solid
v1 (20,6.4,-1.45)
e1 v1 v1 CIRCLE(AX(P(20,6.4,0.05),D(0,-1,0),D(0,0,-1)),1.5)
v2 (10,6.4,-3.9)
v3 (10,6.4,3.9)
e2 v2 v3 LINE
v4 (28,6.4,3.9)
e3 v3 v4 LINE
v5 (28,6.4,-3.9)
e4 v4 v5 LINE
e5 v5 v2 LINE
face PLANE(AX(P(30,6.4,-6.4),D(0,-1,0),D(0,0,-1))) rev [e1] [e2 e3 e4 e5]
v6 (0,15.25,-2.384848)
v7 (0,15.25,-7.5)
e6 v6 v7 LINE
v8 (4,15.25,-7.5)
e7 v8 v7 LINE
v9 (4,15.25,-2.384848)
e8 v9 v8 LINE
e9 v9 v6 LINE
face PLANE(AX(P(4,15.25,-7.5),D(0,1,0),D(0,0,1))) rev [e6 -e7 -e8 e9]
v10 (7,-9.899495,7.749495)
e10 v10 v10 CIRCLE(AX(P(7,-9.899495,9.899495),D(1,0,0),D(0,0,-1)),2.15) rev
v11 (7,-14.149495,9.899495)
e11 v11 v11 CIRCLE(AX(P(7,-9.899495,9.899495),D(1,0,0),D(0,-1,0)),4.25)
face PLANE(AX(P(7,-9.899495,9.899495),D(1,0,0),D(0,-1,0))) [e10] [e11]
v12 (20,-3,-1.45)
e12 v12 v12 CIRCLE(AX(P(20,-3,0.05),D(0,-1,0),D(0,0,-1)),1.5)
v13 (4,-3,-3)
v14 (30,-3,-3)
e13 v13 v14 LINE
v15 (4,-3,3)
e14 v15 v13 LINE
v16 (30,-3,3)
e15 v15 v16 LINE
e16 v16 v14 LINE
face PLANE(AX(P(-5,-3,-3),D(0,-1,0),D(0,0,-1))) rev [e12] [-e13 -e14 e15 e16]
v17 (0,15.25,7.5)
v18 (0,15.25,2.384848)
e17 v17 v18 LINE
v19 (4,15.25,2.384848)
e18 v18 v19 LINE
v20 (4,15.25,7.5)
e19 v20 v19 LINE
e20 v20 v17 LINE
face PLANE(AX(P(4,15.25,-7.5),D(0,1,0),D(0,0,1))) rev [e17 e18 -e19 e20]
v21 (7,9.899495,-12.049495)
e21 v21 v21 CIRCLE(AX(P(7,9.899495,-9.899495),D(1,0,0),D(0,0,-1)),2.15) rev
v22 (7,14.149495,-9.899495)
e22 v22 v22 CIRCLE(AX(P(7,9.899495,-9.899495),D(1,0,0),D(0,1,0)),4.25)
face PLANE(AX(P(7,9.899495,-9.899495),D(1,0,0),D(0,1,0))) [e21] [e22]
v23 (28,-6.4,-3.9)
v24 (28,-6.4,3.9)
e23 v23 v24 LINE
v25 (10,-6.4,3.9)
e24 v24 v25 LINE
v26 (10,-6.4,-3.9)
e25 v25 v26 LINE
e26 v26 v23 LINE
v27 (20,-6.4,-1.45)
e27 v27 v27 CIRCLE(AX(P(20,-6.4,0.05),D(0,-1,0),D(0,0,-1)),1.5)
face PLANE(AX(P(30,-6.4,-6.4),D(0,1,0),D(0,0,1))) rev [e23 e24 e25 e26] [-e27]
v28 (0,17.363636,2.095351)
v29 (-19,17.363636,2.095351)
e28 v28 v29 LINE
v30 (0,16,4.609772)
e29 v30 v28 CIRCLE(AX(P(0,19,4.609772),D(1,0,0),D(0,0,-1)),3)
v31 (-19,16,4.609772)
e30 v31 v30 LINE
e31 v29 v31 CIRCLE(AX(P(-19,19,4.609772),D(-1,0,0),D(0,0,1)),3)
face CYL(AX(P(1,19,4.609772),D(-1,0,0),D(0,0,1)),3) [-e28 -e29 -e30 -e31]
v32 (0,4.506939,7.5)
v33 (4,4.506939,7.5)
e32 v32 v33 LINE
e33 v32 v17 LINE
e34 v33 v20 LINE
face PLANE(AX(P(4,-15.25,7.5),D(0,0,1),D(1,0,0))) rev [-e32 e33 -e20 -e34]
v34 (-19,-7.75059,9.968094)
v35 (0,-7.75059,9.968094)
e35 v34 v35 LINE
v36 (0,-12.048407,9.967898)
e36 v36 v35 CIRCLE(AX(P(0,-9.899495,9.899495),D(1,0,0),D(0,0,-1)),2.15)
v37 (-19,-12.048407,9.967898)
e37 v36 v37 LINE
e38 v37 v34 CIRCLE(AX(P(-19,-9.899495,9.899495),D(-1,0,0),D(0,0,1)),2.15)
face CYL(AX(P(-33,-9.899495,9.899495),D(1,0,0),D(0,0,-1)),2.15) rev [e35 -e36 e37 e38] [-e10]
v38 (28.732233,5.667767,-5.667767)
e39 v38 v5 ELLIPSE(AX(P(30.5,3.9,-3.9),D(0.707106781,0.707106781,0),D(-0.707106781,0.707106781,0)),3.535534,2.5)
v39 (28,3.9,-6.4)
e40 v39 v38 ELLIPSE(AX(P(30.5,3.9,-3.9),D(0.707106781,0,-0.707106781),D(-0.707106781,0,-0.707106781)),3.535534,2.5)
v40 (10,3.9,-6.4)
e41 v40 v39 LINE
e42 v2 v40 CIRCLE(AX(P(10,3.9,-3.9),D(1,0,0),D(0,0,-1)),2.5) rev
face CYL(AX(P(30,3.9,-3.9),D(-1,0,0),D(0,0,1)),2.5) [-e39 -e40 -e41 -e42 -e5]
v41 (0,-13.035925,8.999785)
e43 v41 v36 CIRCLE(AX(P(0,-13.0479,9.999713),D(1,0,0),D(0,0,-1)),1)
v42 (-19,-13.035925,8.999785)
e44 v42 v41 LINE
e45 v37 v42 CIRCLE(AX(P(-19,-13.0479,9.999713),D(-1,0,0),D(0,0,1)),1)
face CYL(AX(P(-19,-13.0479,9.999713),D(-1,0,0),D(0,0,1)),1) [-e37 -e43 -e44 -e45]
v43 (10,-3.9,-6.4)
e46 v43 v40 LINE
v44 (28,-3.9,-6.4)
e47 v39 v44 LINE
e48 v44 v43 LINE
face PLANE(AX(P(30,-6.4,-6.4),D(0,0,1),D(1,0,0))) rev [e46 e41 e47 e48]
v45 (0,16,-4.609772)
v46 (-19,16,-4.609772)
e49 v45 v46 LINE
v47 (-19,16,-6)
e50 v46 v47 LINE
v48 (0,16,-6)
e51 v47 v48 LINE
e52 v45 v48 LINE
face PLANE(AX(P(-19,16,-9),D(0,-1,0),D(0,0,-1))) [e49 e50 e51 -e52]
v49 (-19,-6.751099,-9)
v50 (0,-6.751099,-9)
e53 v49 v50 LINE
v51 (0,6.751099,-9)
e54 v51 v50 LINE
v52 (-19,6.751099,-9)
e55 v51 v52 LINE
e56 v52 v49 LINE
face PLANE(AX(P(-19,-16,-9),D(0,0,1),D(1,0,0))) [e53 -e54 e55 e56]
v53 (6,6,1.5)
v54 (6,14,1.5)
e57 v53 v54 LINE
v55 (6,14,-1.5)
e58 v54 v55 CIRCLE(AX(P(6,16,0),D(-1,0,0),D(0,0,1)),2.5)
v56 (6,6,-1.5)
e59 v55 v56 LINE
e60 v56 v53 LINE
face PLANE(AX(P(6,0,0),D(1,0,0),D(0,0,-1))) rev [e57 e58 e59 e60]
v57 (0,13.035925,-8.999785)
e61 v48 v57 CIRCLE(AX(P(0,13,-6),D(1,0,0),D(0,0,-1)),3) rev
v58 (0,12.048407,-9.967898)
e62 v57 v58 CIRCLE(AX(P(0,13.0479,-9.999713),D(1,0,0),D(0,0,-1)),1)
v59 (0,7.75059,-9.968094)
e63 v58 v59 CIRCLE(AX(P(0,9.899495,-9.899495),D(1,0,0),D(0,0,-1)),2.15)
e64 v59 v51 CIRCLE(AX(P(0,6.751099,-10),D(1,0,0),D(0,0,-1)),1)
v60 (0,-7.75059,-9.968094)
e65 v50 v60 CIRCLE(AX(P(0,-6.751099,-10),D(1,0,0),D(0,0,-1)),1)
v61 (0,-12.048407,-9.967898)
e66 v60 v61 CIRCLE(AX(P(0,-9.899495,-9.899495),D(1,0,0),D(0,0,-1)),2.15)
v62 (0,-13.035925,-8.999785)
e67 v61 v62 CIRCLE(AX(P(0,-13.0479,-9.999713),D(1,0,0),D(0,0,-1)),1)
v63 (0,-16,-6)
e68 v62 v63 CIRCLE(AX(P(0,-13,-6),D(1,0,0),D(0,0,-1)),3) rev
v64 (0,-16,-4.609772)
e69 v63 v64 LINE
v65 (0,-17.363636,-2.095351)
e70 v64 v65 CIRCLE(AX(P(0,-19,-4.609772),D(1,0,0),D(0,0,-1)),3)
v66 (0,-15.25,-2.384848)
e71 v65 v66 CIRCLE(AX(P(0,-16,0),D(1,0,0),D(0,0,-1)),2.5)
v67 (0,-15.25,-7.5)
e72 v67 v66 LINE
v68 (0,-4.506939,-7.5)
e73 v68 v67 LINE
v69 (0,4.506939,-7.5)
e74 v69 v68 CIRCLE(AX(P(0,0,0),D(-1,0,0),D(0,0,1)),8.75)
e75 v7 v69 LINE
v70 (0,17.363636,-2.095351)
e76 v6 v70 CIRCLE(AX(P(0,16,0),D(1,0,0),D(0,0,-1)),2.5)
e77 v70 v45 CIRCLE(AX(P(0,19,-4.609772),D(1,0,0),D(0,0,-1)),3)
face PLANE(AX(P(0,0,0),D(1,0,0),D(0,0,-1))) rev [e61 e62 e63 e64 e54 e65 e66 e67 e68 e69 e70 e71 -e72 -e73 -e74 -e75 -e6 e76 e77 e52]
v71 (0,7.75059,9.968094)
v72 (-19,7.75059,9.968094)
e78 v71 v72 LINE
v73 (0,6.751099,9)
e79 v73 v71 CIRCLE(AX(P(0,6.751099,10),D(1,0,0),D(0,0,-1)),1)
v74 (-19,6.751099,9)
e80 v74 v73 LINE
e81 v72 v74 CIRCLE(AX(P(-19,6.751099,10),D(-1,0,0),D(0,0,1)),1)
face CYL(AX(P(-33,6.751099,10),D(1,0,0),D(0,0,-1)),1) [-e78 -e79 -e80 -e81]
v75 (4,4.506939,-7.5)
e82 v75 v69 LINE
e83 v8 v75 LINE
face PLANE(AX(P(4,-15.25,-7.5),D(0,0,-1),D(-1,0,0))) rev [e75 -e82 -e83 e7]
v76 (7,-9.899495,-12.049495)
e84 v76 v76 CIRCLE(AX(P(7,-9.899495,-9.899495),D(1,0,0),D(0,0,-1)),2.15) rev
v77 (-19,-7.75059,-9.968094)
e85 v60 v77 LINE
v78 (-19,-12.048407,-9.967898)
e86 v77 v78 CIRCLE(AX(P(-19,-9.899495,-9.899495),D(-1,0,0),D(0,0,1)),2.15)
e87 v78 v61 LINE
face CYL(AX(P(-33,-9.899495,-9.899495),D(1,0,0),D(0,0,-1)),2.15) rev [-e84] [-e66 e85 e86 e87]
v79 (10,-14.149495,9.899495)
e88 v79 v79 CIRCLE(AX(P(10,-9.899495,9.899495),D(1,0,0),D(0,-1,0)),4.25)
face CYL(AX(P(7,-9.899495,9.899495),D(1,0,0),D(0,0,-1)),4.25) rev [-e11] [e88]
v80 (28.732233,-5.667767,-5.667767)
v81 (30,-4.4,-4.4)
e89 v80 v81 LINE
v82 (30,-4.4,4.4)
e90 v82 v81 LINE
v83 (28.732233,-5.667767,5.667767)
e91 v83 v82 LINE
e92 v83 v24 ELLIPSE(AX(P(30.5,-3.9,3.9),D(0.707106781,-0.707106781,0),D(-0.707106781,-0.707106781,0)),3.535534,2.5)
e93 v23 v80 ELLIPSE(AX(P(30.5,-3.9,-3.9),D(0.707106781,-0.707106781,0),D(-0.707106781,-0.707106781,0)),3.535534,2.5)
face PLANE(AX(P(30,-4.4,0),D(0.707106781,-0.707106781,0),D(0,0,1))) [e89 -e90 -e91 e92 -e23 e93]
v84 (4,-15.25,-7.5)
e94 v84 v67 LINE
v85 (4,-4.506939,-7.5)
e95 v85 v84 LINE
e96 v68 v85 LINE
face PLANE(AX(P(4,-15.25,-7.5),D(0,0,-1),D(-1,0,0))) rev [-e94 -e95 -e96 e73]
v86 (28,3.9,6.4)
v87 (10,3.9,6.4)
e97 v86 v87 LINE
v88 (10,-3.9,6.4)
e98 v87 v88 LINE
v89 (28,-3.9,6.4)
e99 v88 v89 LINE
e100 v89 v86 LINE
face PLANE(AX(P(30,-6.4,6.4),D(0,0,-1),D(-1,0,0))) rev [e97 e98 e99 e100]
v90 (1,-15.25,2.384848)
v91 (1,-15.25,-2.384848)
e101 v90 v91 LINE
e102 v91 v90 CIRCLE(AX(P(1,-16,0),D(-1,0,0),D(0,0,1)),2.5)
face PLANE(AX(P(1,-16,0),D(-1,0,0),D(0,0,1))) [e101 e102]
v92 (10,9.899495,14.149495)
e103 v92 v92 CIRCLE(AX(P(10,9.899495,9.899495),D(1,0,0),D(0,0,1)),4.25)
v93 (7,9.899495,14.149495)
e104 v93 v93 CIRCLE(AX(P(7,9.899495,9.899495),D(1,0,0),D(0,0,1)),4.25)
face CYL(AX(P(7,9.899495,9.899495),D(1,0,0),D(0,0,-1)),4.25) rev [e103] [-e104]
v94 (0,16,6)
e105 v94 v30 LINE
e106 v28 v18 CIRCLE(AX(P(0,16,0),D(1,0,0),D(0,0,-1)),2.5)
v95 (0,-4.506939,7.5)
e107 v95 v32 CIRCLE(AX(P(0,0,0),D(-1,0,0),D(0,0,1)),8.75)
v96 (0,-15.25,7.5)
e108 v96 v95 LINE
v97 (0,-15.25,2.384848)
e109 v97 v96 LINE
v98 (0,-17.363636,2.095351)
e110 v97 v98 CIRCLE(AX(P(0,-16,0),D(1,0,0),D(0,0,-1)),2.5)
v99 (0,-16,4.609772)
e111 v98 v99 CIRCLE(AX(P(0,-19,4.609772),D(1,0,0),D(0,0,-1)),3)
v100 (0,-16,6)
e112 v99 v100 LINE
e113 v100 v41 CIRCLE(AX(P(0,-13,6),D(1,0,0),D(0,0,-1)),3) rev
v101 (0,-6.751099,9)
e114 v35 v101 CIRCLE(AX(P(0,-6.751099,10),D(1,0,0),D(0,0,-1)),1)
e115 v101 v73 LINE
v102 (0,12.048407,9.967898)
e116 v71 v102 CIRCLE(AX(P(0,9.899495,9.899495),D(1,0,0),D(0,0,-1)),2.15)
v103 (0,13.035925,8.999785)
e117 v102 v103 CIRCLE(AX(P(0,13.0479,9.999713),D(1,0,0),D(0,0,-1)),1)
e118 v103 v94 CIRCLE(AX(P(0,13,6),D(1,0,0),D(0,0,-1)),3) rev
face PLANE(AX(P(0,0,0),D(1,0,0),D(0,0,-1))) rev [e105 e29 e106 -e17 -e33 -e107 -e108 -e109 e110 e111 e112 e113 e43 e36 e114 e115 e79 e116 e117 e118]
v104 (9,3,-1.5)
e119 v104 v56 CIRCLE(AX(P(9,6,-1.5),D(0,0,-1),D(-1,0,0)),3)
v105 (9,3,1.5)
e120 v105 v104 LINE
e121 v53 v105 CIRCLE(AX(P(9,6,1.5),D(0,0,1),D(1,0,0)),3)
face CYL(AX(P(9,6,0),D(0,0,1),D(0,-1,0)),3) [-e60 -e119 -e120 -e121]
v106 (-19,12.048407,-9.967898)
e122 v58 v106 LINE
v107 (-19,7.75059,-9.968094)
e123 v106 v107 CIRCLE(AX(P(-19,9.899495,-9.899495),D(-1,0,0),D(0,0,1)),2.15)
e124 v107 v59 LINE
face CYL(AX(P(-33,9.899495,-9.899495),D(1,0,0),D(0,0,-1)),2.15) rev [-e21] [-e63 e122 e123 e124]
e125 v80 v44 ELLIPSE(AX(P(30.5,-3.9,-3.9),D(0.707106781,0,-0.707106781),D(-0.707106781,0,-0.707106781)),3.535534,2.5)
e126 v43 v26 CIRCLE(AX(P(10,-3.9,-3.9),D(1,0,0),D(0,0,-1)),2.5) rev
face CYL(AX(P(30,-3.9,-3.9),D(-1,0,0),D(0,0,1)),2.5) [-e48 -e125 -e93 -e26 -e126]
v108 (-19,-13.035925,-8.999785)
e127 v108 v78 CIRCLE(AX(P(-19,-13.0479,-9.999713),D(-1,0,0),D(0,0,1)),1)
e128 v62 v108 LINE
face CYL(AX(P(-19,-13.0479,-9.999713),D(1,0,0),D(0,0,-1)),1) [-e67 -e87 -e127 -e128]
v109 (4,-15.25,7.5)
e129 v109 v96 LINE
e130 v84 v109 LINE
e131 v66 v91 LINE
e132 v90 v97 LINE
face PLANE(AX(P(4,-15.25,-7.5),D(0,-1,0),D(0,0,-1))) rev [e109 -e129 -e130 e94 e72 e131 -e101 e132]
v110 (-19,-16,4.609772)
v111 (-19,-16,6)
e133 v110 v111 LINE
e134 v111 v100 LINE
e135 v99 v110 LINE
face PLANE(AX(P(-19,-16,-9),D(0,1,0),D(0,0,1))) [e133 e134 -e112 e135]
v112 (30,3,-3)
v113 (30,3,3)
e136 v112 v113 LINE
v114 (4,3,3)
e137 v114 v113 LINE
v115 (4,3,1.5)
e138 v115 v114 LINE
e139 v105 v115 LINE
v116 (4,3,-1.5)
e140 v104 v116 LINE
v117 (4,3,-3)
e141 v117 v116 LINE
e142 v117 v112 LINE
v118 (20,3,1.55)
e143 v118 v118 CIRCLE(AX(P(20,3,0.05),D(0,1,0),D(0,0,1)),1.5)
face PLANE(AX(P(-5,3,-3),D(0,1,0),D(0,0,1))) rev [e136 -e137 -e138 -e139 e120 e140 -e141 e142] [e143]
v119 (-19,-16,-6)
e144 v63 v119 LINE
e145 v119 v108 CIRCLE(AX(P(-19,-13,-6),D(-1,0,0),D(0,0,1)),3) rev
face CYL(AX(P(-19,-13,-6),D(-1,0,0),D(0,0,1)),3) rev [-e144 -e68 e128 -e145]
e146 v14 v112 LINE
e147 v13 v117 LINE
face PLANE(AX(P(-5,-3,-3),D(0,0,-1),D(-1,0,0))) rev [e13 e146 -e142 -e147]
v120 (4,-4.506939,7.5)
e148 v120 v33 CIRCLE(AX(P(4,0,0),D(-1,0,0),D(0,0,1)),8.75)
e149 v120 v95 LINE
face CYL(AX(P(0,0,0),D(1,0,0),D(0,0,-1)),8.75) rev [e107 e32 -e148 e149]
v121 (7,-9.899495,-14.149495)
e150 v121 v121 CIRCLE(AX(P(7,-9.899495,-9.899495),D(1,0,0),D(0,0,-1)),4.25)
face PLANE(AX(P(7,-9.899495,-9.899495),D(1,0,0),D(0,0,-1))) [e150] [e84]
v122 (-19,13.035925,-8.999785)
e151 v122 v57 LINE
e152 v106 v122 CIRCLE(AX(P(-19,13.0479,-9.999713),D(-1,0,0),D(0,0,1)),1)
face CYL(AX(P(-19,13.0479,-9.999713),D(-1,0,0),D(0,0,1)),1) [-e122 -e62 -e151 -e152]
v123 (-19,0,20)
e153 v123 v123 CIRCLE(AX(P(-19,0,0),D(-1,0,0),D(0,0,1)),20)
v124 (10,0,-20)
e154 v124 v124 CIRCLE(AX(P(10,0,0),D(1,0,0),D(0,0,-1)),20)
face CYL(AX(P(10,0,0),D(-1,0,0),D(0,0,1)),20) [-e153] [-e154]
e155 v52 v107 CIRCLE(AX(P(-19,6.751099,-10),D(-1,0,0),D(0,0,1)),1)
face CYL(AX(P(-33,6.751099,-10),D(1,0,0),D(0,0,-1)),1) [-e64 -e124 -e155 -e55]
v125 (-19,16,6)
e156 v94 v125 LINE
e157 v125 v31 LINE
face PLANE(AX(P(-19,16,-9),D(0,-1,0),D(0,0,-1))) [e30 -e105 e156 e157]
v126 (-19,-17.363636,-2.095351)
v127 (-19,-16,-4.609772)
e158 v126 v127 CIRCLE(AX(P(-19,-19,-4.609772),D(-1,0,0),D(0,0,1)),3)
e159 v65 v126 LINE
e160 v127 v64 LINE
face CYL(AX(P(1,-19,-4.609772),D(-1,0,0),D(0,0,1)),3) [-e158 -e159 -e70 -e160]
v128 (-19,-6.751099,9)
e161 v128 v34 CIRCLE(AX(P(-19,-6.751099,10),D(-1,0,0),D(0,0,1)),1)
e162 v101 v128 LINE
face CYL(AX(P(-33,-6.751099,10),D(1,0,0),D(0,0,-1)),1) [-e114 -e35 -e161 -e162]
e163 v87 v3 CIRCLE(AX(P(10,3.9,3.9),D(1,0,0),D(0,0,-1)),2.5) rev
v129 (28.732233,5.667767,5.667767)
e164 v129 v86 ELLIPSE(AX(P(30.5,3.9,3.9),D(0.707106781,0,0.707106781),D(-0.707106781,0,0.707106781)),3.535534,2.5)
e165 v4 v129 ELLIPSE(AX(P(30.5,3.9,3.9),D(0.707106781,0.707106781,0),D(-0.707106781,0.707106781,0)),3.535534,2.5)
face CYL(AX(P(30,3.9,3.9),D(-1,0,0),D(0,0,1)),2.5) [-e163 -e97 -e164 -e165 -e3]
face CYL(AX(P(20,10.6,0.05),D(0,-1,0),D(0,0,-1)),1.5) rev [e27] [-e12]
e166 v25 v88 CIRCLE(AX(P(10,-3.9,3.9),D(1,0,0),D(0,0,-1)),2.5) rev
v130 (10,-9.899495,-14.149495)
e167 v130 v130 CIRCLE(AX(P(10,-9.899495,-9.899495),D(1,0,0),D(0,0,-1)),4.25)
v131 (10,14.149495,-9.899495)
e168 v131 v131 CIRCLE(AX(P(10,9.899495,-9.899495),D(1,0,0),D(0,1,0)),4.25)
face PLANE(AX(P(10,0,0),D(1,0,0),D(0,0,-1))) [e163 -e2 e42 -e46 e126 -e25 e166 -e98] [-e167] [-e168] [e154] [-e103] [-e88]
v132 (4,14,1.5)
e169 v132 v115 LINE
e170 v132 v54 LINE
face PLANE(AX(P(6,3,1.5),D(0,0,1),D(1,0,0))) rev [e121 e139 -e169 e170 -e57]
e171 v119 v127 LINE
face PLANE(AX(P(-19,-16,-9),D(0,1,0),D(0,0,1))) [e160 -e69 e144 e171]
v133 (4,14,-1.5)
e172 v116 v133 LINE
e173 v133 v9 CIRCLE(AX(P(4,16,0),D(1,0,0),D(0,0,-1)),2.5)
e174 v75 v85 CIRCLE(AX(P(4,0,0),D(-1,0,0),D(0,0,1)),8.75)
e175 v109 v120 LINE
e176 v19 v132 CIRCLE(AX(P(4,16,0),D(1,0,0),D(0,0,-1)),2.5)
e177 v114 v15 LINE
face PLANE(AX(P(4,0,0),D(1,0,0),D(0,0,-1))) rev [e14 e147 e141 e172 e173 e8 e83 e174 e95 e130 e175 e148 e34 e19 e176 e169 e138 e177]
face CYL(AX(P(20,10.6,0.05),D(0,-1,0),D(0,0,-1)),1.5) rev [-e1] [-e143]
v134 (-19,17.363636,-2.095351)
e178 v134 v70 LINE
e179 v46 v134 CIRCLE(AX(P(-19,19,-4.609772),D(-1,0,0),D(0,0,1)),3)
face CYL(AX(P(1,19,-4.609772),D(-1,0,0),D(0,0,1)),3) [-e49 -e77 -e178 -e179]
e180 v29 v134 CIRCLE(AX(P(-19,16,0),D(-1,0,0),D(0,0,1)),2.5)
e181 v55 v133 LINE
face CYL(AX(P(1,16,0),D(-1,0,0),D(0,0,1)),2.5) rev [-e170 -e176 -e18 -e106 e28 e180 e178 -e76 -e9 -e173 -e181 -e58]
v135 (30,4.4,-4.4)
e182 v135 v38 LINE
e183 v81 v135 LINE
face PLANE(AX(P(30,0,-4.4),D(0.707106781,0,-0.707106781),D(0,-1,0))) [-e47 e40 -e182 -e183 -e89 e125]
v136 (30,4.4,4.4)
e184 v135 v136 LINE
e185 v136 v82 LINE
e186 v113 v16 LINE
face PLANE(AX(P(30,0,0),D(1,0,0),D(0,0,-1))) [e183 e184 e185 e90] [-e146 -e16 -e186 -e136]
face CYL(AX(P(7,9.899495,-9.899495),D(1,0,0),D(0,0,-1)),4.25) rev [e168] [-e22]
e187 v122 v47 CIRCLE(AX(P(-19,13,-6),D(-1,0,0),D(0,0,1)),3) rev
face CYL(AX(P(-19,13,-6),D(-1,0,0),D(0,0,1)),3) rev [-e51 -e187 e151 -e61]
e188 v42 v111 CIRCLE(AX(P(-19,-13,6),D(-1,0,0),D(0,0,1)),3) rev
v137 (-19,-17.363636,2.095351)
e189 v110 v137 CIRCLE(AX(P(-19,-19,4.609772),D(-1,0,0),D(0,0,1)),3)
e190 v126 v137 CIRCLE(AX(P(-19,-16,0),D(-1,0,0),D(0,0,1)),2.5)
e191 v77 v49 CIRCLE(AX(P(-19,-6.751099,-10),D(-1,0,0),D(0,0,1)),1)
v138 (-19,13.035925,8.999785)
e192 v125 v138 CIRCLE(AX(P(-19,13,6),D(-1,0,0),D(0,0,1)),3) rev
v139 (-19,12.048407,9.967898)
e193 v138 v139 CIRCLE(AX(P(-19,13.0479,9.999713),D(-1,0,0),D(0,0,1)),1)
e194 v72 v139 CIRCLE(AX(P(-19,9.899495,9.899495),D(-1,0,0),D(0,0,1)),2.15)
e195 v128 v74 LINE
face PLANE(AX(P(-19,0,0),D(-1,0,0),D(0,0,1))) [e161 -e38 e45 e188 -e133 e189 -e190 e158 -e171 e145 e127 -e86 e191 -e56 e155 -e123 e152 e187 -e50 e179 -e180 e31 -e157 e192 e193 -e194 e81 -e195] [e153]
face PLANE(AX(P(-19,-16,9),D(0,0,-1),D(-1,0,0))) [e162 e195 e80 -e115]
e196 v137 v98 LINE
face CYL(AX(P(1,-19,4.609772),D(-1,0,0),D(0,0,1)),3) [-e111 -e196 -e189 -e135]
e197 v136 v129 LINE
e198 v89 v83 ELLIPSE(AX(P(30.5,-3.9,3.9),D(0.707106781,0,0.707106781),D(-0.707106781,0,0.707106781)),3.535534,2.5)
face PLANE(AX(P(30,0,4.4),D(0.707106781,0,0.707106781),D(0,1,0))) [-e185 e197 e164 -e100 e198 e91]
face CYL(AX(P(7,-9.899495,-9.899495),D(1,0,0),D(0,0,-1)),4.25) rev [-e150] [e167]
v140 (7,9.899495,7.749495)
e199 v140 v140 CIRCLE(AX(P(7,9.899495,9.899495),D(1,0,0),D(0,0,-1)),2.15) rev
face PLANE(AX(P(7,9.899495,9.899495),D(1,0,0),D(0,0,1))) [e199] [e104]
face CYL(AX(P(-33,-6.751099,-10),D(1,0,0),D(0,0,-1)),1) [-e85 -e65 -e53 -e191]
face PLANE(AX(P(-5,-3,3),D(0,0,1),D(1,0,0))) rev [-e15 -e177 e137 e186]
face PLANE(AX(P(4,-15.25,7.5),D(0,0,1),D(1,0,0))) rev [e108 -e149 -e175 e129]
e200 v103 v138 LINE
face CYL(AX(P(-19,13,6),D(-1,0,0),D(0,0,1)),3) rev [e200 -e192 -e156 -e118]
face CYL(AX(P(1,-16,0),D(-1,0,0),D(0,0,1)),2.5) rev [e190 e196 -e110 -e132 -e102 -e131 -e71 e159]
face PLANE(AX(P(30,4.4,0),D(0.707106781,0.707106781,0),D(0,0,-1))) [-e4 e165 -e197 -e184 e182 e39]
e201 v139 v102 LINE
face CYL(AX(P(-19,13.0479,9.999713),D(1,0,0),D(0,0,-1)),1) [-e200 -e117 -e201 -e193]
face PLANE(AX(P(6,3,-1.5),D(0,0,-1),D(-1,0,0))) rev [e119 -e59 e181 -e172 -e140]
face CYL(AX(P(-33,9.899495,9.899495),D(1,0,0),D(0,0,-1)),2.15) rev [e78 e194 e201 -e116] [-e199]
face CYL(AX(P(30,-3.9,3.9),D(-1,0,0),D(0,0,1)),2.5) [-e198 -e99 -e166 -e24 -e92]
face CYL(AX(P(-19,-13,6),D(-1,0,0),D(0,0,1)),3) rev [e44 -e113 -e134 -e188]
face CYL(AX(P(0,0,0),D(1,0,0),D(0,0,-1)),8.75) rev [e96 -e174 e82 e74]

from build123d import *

# Parameters (mm, degrees)
SKETCH_1_R               = 20
EXTRUDE_1_DEPTH          = 10
SKETCH_2_W               = 15
SKETCH_2_H               = 30.5
CUT_EXTRUDE_1_DEPTH      = 4
SKETCH_3_R               = 8.75
CUT_EXTRUDE_2_DEPTH      = 4
EXTRUDE_START            = 19
SKETCH_4_R               = 20
SKETCH_4_W               = 18
SKETCH_4_H               = 32
EXTRUDE_2_DEPTH          = 19
FILLET_1_R               = 3
SKETCH_5_R               = 2.5
CUT_EXTRUDE_3_DEPTH      = 20
FILLET_2_R               = 3
SKETCH_6_R               = 2.15
CUT_EXTRUDE_4_DEPTH      = 43
FILLET_3_R               = 1
SKETCH_7_R               = 4.25
CUT_EXTRUDE_5_DEPTH      = 3
PATTERN_CIRCULAR_1_COUNT = 4
SKETCH_8_W               = 12.8
SKETCH_8_H               = 12.8
EXTRUDE_3_DEPTH          = 20
SKETCH_9_W               = 6
SKETCH_9_H               = 6
CUT_EXTRUDE_6_DEPTH      = 35
SKETCH_10_W              = 3
SKETCH_10_H              = 15
CUT_EXTRUDE_7_DEPTH      = 5
SKETCH_11_R              = 2.5
CUT_EXTRUDE_8_DEPTH      = 5
SKETCH_12_R              = 1.5
CUT_EXTRUDE_9_DEPTH      = 17
CHAMFER_1_SIZE           = 2
FILLET_4_R               = 3
FILLET_5_R               = 2.5


with BuildPart() as part:
    # 草图1 → 凸台-拉伸1 (new body)
    with BuildSketch(Plane(origin=(0, 0, 0), x_dir=(0, 0, -1), z_dir=(1, 0, 0))):
        Circle(SKETCH_1_R)
    extrude(amount=EXTRUDE_1_DEPTH)

    # 草图2 → 切除-拉伸1 (cut)
    with BuildSketch(Plane.ZY):
        Rectangle(SKETCH_2_W, SKETCH_2_H)
    extrude(amount=-CUT_EXTRUDE_1_DEPTH, mode=Mode.SUBTRACT)

    # 草图3 → 切除-拉伸2 (cut)
    with BuildSketch(Plane.ZY.offset(-4)):
        Circle(SKETCH_3_R)
    extrude(amount=CUT_EXTRUDE_2_DEPTH, mode=Mode.SUBTRACT)

    # 草图4 → 凸台-拉伸2 (add)
    with BuildSketch(Plane.ZY.offset(EXTRUDE_START)):
        Circle(SKETCH_4_R)
        Rectangle(SKETCH_4_W, SKETCH_4_H, mode=Mode.SUBTRACT)
    extrude(amount=-EXTRUDE_2_DEPTH)

    # 圆角1
    fillet_1_edges = [part.edges().sort_by_distance(p)[0] for p in [
        (-9.5, 16, 9),
        (-9.5, 16, -9),
        (-9.5, -16, -9),
        (-9.5, -16, 9),
    ]]
    fillet(fillet_1_edges, radius=FILLET_1_R)

    # 草图5 → 切除-拉伸3 (cut)
    with BuildSketch(Plane.ZY.offset(19)):
        with Locations((0, -16)):
            Circle(SKETCH_5_R)
        with Locations((0, 16)):
            Circle(SKETCH_5_R)
    extrude(amount=-CUT_EXTRUDE_3_DEPTH, mode=Mode.SUBTRACT)

    # 圆角2
    # the kernel refuses this fillet: 3 mm, written as the material it takes off along each edge
    with BuildSketch(Plane(origin=(-24.274430572, -16, 2.5), x_dir=(0, -0.9586814917396833, -0.2844816292764363), z_dir=(1, 0, 0))) as fillet_2_piece_1:
        with BuildLine():
            CenterArc((2.275853034, -2.876044475), FILLET_2_R, 106.527865575, 56.944268849)
            Line((-0.600191441, -2.022599587), (0, 0))
            ThreePointArc((0, 0), (0.711204073, -0.103296271), (1.422408146, 0))
        make_face()
    extrude(amount=24.274430572, mode=Mode.SUBTRACT)
    with BuildSketch(Plane(origin=(0, -16, -2.5), x_dir=(0, 0, -1), z_dir=(-1, 0, 0))) as fillet_2_piece_2:
        with BuildLine():
            CenterArc((2.109772229, 3), FILLET_2_R, 213.055731151, 56.944268849)
            ThreePointArc((-0.404648987, 1.363636364), (-0.103296271, 0.711204073), (0, 0))
            Line((0, 0), (2.109772229, 0))
        make_face()
    extrude(amount=24.274430572, mode=Mode.SUBTRACT)
    with BuildSketch(Plane(origin=(0, 16, -2.5), x_dir=(0, 0.9586814917396834, 0.2844816292764354), z_dir=(-1, 0, 0))) as fillet_2_piece_3:
        with BuildLine():
            CenterArc((2.275853034, 2.876044475), FILLET_2_R, 196.527865575, 56.944268849)
            Line((-0.600191441, 2.022599587), (0, 0))
            ThreePointArc((0, 0), (0.711204073, 0.103296271), (1.422408146, 0))
        make_face()
    extrude(amount=24.274430572, mode=Mode.SUBTRACT)
    with BuildSketch(Plane(origin=(-24.274430572, 16, 2.5), x_dir=(0, 0, 1), z_dir=(1, 0, 0))) as fillet_2_piece_4:
        with BuildLine():
            CenterArc((2.109772229, -3), FILLET_2_R, 90, 56.944268849)
            ThreePointArc((-0.404648987, -1.363636364), (-0.103296271, -0.711204073), (0, 0))
            Line((0, 0), (2.109772229, 0))
        make_face()
    extrude(amount=24.274430572, mode=Mode.SUBTRACT)

    # 草图6 → 切除-拉伸4 (cut)
    with BuildSketch(Plane(origin=(10, 0, 0), x_dir=(0, 0, -1), z_dir=(1, 0, 0))):
        with Locations((9.899494937, -9.899494937)):
            Circle(SKETCH_6_R)
        with Locations((-9.899494937, -9.899494937)):
            Circle(SKETCH_6_R)
        with Locations((-9.899494937, 9.899494937)):
            Circle(SKETCH_6_R)
        with Locations((9.899494937, 9.899494937)):
            Circle(SKETCH_6_R)
    extrude(amount=-CUT_EXTRUDE_4_DEPTH, mode=Mode.SUBTRACT)

    # 圆角3
    # the kernel refuses this fillet: 1 mm, written as the material it takes off along each edge
    with BuildSketch(Plane(origin=(-21.98900269, -7.946699797, 9), x_dir=(0, 0.1985408891964352, 0.9800926054802622), z_dir=(1, 0, 0)), Plane(origin=(-21.98900269, 7.946699797, -9), x_dir=(0, -0.19854088919647347, -0.9800926054802545), z_dir=(1, 0, 0))) as fillet_3_piece_1:
        with BuildLine():
            CenterArc((1.217468306, -0.973258884), FILLET_3_R, 103.280057781, 88.171589383)
            Line((0.237375701, -1.171799774), (0, 0))
            ThreePointArc((0, 0), (0.493878653, -0.057493399), (0.987757305, 0))
        make_face()
    extrude(amount=21.98900269, mode=Mode.SUBTRACT)
    with BuildSketch(Plane(origin=(-21.959087911, -11.852290077, 9), x_dir=(0, -0.999999983485678, -0.00018173784322620402), z_dir=(1, 0, 0)), Plane(origin=(-21.959087911, 11.852290077, -9), x_dir=(0, 0.9999999834856781, 0.00018173784322619477), z_dir=(1, 0, 0))) as fillet_3_piece_2:
        with BuildLine():
            CenterArc((1.195428513, -0.999930456), FILLET_3_R, 90.675724778, 87.490671362)
            Line((0.195940547, -0.967933494), (0.09599175, -0.964733798))
            ThreePointArc((0.09599175, -0.964733798), (0.056286672, -0.492404834), (-0.090835283, -0.041820466))
            Line((-0.090835283, -0.041820466), (1.8174e-05, 0.099999998))
            ThreePointArc((1.8174e-05, 0.099999998), (1.147728078, 0.099791416), (1.182455829, 0.099993046))
            Line((1.182455829, 0.099993046), (1.183635164, 0))
        make_face()
    extrude(amount=21.959087911, mode=Mode.SUBTRACT)
    with BuildSketch(Plane(origin=(-21.959087911, -11.852290077, -9), x_dir=(0, -0.19858553154825268, -0.98008356105982), z_dir=(1, 0, 0)), Plane(origin=(-21.959087911, 11.852290077, 9), x_dir=(0, 0.19858553154822475, 0.9800835610598256), z_dir=(1, 0, 0))) as fillet_3_piece_3:
        with BuildLine():
            CenterArc((1.217233349, -0.973269347), FILLET_3_R, 103.277447997, 87.490671362)
            Line((0.234841987, -1.160104066), (0.136602851, -1.178787538))
            ThreePointArc((0.136602851, -1.178787538), (0.129910229, -1.144710182), (-0.098008356, -0.019858553))
            Line((-0.098008356, -0.019858553), (0.022966667, 0.097326935))
            ThreePointArc((0.022966667, 0.097326935), (0.49378334, 0.042529095), (0.964600013, 0.097326935))
            Line((0.964600013, 0.097326935), (0.987566679, 0))
        make_face()
    extrude(amount=21.959087911, mode=Mode.SUBTRACT)
    with BuildSketch(Plane(origin=(-21.98900269, -7.946699797, -9), x_dir=(0, 1, 0), z_dir=(1, 0, 0)), Plane(origin=(-21.98900269, 7.946699797, 9), x_dir=(0, -1, 0), z_dir=(1, 0, 0))) as fillet_3_piece_4:
        with BuildLine():
            CenterArc((1.195601076, -1), FILLET_3_R, 90, 88.171589383)
            ThreePointArc((0.196110214, -0.968093631), (0.154403962, -0.472632025), (0, 0))
            Line((0, 0), (1.195601076, 0))
        make_face()
    extrude(amount=21.98900269, mode=Mode.SUBTRACT)

    # 草图7 → 切除-拉伸5 (cut)
    with BuildSketch(Plane(origin=(10, 0, 0), x_dir=(0, 0, -1), z_dir=(1, 0, 0))):
        with Locations((9.899494937, -9.899494937)):
            Circle(SKETCH_7_R)
    cut_extrude_5 = extrude(amount=-CUT_EXTRUDE_5_DEPTH, mode=Mode.SUBTRACT)

    # 阵列(圆周)1: 切除-拉伸5 ×4 about axis
    pattern_circular_1_axis = Axis((0, 0, 0), (1, 0, 0))
    for i in range(1, PATTERN_CIRCULAR_1_COUNT):
        add(cut_extrude_5.rotate(pattern_circular_1_axis, i * 360 / PATTERN_CIRCULAR_1_COUNT), mode=Mode.SUBTRACT)

    # 草图8 → 凸台-拉伸3 (add)
    with BuildSketch(Plane(origin=(10, 0, 0), x_dir=(0, 0, -1), z_dir=(1, 0, 0))):
        Rectangle(SKETCH_8_W, SKETCH_8_H)
    extrude(amount=EXTRUDE_3_DEPTH)

    # 草图9 → 切除-拉伸6 (cut)
    with BuildSketch(Plane(origin=(30, 0, 0), x_dir=(0, 0, -1), z_dir=(1, 0, 0))):
        Rectangle(SKETCH_9_W, SKETCH_9_H)
    extrude(amount=-CUT_EXTRUDE_6_DEPTH, mode=Mode.SUBTRACT)

    # 草图10 → 切除-拉伸7 (cut)
    with BuildSketch(Plane.ZY.offset(-1)):
        with Locations((0, 10.5)):
            Rectangle(SKETCH_10_W, SKETCH_10_H)
    extrude(amount=-CUT_EXTRUDE_7_DEPTH, mode=Mode.SUBTRACT)

    # 草图11 → 切除-拉伸8 (cut)
    with BuildSketch(Plane.ZY.offset(-1)):
        with Locations((0, 16)):
            Circle(SKETCH_11_R)
    extrude(amount=-CUT_EXTRUDE_8_DEPTH, mode=Mode.SUBTRACT)

    # 草图12 → 切除-拉伸9 (cut)
    with BuildSketch(Plane.XZ.offset(6.4)):
        with Locations(Location((20, 0.05, 0), (0, 0, 270))):
            Circle(SKETCH_12_R)
    extrude(amount=-CUT_EXTRUDE_9_DEPTH, mode=Mode.SUBTRACT)

    # 倒角1
    chamfer_1_edges = [part.edges().sort_by_distance(p)[0] for p in [
        (30, 0, 6.4),
        (30, -6.4, 0),
        (30, 0, -6.4),
        (30, 6.4, 0),
    ]]
    chamfer(chamfer_1_edges, length=CHAMFER_1_SIZE)

    # 圆角4
    fillet_4_edges = [part.edges().sort_by_distance(p)[0] for p in [
        (6, 3, 0),
    ]]
    fillet(fillet_4_edges, radius=FILLET_4_R)

    # 圆角5
    fillet_5_edges = [part.edges().sort_by_distance(p)[0] for p in [
        (19, -6.4, 6.4),
        (19, 6.4, 6.4),
        (19, 6.4, -6.4),
        (19, -6.4, -6.4),
    ]]
    fillet(fillet_5_edges, radius=FILLET_5_R)


solid = part.part
